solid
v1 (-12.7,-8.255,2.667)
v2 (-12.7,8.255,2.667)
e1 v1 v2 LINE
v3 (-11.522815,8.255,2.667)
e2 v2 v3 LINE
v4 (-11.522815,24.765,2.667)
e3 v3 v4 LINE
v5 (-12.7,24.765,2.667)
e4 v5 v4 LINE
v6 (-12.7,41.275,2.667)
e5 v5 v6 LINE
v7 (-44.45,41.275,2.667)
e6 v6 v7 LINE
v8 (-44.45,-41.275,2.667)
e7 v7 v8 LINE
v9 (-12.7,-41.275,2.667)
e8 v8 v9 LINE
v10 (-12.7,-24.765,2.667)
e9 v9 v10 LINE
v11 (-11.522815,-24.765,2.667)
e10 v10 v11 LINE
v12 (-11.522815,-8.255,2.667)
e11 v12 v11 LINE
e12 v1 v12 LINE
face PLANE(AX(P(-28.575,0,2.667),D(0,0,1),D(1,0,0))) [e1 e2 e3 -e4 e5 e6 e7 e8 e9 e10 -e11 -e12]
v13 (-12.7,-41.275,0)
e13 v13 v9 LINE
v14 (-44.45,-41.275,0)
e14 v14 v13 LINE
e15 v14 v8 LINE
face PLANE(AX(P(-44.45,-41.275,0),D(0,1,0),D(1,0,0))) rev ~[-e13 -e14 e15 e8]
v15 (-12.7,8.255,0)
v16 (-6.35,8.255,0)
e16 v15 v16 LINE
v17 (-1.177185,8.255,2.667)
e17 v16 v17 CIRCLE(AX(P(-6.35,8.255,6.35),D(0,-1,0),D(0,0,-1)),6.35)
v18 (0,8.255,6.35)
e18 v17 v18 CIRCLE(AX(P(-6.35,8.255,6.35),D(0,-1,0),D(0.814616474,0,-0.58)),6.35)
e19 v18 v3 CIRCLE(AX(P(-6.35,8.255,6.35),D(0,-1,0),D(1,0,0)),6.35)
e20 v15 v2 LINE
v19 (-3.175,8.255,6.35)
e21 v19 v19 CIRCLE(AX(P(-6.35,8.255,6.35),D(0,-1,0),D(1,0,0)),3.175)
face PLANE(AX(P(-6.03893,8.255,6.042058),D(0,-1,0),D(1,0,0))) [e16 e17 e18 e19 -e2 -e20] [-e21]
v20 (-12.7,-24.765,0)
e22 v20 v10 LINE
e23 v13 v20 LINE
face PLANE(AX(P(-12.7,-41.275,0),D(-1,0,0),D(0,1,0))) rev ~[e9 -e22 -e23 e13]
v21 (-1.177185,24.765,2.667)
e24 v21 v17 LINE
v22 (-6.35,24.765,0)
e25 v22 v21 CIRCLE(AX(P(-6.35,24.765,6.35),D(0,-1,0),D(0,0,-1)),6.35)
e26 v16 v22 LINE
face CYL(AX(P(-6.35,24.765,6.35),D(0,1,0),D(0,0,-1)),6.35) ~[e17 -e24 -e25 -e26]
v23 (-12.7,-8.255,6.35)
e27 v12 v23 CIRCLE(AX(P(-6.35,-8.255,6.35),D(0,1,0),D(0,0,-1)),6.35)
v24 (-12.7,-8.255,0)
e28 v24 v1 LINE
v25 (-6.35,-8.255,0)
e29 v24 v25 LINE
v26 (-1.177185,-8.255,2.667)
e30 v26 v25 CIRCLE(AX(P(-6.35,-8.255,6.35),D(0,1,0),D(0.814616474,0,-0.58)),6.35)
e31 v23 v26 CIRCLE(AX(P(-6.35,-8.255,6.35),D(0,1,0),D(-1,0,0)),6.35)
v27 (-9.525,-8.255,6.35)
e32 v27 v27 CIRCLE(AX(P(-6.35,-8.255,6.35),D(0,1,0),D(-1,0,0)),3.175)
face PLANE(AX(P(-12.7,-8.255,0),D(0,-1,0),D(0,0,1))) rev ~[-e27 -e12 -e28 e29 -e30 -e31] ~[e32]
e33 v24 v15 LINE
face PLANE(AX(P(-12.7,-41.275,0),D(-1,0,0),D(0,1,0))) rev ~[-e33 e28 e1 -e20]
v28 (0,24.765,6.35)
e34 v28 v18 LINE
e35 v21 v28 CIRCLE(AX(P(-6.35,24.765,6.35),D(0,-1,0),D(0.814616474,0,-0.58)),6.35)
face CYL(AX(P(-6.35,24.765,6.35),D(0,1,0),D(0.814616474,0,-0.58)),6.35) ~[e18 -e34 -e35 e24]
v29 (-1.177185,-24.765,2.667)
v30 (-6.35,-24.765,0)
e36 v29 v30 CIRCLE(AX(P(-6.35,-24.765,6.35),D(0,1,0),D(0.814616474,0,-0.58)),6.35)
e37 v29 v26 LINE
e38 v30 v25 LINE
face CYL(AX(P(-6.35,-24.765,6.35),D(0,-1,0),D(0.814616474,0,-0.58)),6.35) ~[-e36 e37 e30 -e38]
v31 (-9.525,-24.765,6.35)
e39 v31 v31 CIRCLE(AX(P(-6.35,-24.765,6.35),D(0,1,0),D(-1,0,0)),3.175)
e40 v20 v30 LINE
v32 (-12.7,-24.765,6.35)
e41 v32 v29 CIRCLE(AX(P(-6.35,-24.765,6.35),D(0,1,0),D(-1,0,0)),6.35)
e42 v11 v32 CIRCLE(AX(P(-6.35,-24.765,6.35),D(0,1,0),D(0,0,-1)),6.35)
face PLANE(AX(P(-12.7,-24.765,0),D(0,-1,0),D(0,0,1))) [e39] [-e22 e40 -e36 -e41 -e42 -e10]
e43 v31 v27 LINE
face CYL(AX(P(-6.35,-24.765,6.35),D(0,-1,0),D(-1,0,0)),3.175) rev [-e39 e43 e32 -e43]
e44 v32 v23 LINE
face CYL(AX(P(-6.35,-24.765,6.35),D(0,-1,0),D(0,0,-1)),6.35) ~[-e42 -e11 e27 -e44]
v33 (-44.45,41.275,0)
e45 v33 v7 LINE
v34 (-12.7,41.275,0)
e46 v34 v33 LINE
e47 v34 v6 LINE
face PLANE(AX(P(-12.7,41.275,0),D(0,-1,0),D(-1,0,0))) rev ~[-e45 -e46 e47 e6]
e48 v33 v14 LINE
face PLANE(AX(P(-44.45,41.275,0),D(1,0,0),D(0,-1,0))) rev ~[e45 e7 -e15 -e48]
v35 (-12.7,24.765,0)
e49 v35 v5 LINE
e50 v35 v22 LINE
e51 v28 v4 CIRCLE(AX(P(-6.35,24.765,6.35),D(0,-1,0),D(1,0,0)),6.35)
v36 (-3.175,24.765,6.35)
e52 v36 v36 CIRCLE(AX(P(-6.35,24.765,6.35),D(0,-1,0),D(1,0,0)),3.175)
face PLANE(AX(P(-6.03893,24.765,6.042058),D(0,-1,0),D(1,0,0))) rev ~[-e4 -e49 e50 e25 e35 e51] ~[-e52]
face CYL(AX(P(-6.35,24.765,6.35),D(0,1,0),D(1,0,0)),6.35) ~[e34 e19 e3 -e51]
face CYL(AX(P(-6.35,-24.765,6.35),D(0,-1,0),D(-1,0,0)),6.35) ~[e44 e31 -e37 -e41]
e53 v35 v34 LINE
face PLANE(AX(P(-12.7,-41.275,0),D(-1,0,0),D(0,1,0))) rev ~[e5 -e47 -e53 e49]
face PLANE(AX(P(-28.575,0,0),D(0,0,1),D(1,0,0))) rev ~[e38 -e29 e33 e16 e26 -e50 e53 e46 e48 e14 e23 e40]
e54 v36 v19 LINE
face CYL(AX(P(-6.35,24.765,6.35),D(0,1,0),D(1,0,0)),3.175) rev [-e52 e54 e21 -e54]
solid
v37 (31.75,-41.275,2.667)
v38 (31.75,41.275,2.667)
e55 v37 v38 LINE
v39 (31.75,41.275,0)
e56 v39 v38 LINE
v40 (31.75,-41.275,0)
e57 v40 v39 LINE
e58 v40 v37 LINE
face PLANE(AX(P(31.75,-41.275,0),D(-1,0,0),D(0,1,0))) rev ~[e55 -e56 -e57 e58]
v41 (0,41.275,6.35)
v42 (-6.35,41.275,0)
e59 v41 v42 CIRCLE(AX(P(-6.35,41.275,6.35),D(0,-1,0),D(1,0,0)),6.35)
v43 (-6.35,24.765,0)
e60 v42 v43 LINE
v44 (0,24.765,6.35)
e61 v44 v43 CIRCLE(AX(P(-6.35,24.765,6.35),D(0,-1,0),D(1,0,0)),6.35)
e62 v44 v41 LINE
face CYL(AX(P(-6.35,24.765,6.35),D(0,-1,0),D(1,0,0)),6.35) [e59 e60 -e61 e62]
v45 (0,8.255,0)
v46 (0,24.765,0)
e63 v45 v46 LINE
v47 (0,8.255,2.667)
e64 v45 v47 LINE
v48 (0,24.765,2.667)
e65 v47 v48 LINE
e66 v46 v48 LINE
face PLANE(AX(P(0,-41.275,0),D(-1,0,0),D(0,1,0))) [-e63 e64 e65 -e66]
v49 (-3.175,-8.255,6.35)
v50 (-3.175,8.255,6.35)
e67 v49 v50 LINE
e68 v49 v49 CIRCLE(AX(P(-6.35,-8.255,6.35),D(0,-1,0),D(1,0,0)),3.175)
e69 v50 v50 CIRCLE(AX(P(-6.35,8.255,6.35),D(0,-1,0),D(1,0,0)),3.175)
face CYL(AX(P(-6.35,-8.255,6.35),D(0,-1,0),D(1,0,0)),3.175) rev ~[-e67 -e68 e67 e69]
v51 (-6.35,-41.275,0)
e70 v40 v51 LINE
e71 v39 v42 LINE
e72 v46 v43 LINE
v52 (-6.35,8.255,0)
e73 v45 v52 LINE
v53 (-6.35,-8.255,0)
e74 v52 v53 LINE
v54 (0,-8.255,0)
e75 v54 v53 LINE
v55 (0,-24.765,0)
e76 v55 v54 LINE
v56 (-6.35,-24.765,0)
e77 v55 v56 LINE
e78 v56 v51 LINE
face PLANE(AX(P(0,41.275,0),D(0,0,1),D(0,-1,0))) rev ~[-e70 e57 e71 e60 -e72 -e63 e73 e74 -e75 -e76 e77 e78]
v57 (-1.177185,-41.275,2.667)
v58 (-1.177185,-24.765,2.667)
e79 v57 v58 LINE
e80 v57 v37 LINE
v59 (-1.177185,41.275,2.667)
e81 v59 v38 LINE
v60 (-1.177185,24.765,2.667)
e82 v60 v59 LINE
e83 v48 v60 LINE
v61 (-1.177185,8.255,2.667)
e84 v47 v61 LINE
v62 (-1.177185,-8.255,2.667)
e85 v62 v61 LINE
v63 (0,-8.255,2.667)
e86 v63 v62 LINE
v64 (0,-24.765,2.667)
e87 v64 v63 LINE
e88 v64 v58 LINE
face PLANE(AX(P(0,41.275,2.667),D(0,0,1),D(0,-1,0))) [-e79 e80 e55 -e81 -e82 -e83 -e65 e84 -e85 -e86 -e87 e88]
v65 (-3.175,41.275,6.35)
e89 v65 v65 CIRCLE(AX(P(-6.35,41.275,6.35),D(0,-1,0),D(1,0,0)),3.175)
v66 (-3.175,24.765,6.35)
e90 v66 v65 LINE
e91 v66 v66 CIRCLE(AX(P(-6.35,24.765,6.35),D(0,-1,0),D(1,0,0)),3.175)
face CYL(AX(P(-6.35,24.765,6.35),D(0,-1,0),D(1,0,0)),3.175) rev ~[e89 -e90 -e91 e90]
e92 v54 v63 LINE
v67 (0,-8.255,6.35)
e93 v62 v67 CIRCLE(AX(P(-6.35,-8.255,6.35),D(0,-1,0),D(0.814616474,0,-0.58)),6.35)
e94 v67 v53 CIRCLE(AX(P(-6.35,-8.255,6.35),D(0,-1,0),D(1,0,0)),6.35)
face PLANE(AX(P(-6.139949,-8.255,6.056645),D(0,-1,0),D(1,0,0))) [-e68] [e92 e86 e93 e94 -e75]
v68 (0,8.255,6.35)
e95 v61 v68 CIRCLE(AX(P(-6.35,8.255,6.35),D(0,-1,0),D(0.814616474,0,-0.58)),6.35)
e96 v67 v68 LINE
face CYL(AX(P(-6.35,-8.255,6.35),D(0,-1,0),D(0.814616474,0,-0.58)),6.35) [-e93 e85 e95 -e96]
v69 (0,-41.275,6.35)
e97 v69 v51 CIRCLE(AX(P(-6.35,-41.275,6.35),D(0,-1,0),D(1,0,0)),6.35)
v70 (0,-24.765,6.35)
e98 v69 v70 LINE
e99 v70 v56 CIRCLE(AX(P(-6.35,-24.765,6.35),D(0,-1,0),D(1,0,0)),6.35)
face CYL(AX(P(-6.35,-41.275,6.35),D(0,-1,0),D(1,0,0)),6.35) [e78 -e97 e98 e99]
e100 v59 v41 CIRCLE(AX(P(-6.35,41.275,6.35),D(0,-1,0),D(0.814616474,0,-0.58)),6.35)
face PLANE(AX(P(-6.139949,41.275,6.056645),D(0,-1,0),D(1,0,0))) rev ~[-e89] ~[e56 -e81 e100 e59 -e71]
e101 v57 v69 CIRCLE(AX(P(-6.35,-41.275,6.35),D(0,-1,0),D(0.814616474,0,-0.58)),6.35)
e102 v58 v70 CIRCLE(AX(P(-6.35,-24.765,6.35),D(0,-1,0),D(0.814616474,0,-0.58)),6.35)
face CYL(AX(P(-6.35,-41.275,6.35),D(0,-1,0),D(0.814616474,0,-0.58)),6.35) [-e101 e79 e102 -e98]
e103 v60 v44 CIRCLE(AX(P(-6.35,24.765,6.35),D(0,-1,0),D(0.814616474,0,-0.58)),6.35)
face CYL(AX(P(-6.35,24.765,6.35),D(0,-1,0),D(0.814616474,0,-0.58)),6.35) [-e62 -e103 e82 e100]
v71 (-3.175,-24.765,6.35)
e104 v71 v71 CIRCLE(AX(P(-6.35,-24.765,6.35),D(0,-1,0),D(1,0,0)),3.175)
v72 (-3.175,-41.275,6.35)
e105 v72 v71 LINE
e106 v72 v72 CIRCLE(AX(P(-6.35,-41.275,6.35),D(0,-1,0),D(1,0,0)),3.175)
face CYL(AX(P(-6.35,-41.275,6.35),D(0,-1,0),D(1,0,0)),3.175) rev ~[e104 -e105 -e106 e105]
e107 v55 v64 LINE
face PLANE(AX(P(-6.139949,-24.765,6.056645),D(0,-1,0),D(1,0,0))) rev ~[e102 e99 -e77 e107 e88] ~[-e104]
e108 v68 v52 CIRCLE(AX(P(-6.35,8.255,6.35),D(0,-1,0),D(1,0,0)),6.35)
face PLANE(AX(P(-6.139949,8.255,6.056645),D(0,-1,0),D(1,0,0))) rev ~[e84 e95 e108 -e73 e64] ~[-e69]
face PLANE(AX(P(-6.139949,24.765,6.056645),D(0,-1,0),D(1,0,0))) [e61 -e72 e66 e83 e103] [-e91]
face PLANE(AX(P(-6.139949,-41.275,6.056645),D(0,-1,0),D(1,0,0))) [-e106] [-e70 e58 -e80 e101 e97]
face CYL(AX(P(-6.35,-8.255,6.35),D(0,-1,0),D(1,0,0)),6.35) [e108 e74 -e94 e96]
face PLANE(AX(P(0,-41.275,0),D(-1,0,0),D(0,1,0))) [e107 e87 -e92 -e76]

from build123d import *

# Parameters (mm, degrees)
F0_W      = 31.75
F0_H      = 82.55
F1_DEPTH  = 2.667
F2_W      = 16.51
F2_H      = 2.667
F3_DEPTH  = 6.35
F4_R      = 3.175
F5_DEPTH  = 16.51
F6_R      = 3.175
F7_DEPTH  = 16.51
F8_R      = 3.175
F9_DEPTH  = 16.51
F11_DEPTH = 2.667
F12_W     = 16.51
F12_H     = 2.667
F13_DEPTH = 6.35
F14_R     = 3.175
F15_DEPTH = 16.51
F16_R     = 3.175
F17_DEPTH = 16.51


with BuildPart() as f1:
    # F0 (on Top) → F1 (new body)
    with BuildSketch(Plane.XY):
        with Locations((15.875, 0)):
            Rectangle(F0_W, F0_H)
    extrude(amount=F1_DEPTH)

    # F2 (on face) → F3 (join)
    with BuildSketch(Plane(origin=(0, 0, 0), x_dir=(0, -1, 0), z_dir=(-1, 0, 0))):
        with Locations((-33.02, 1.3335)):
            Rectangle(F2_W, F2_H)
        with Locations((0, 1.3335)):
            Rectangle(F2_W, F2_H)
        with Locations((33.02, 1.3335)):
            Rectangle(F2_W, F2_H)
    extrude(amount=F3_DEPTH)

    # F4 (on face) → F5 (join, through all)
    with BuildSketch(Plane.XZ.offset(41.275)):
        with BuildLine():
            ThreePointArc((-1.177185389, 2.667), (-0.3014517122, 4.4167220557), (0, 6.35))
            ThreePointArc((0, 6.35), (-10.8401280605, 10.8401280605), (-6.35, 0))
            Line((-6.35, 0), (-6.35, 2.667))
            Line((-6.35, 2.667), (-1.177185389, 2.667))
        make_face()
        with Locations((-6.35, 6.35)):
            Circle(F4_R, mode=Mode.SUBTRACT)
    extrude(amount=-F5_DEPTH)

    # F6 (on face) → F7 (join, through all)
    with BuildSketch(Plane.XZ.offset(8.255)):
        with BuildLine():
            ThreePointArc((-1.177185389, 2.667), (-0.3014517122, 4.4167220557), (0, 6.35))
            ThreePointArc((0, 6.35), (-10.8401280605, 10.8401280605), (-6.35, 0))
            Line((-6.35, 0), (-6.35, 2.667))
            Line((-6.35, 2.667), (-1.177185389, 2.667))
        make_face()
        with Locations((-6.35, 6.35)):
            Circle(F6_R, mode=Mode.SUBTRACT)
    extrude(amount=-F7_DEPTH)

    # F8 (on face) → F9 (join, through all)
    with BuildSketch(Plane.XZ.offset(-24.765)):
        with BuildLine():
            ThreePointArc((-1.177185389, 2.667), (-0.3014517122, 4.4167220557), (0, 6.35))
            ThreePointArc((0, 6.35), (-10.8401280605, 10.8401280605), (-6.35, 0))
            Line((-6.35, 0), (-6.35, 2.667))
            Line((-6.35, 2.667), (-1.177185389, 2.667))
        make_face()
        with Locations((-6.35, 6.35)):
            Circle(F8_R, mode=Mode.SUBTRACT)
    extrude(amount=-F9_DEPTH)


with BuildPart() as f11:
    # F10 (on Top) → F11 (new body)
    with BuildSketch(Plane.XY):
        Polygon((-12.7, -40.005), (-12.7, 40.005), (-12.7, 41.275), (-44.45, 41.275), (-44.45, -41.275), (-12.7, -41.275), align=None)
    extrude(amount=F11_DEPTH)

    # F12 (on face) → F13 (join)
    with BuildSketch(Plane.YZ.offset(-12.7)):
        with Locations((-16.51, 1.3335)):
            Rectangle(F12_W, F12_H)
        with Locations((16.51, 1.3335)):
            Rectangle(F12_W, F12_H)
    extrude(amount=F13_DEPTH)

    # F14 (on face) → F15 (join, through all)
    with BuildSketch(Plane.XZ.offset(-24.765)):
        with BuildLine():
            ThreePointArc((-1.177185389, 2.667), (-0.3014517122, 4.4167220557), (0, 6.35))
            ThreePointArc((0, 6.35), (-10.8401280605, 10.8401280605), (-6.35, 0))
            ThreePointArc((-6.35, 0), (-3.4400644337, 0.705996545), (-1.177185389, 2.667))
        make_face()
        with Locations((-6.35, 6.35)):
            Circle(F14_R, mode=Mode.SUBTRACT)
    extrude(amount=F15_DEPTH)

    # F16 (on face) → F17 (join, through all)
    with BuildSketch(Plane(origin=(0, -24.765, 0), x_dir=(-1, 0, 0), z_dir=(0, 1, 0))):
        with BuildLine():
            ThreePointArc((6.35, 0), (10.8401280605, 1.8598719395), (12.7, 6.35))
            ThreePointArc((12.7, 6.35), (4.4167220557, 12.3985482878), (1.177185389, 2.667))
            ThreePointArc((1.177185389, 2.667), (3.4400644337, 0.705996545), (6.35, 0))
        make_face()
        with Locations((6.35, 6.35)):
            Circle(F16_R, mode=Mode.SUBTRACT)
    extrude(amount=F17_DEPTH)


solid = Compound([f1.part, f11.part])
